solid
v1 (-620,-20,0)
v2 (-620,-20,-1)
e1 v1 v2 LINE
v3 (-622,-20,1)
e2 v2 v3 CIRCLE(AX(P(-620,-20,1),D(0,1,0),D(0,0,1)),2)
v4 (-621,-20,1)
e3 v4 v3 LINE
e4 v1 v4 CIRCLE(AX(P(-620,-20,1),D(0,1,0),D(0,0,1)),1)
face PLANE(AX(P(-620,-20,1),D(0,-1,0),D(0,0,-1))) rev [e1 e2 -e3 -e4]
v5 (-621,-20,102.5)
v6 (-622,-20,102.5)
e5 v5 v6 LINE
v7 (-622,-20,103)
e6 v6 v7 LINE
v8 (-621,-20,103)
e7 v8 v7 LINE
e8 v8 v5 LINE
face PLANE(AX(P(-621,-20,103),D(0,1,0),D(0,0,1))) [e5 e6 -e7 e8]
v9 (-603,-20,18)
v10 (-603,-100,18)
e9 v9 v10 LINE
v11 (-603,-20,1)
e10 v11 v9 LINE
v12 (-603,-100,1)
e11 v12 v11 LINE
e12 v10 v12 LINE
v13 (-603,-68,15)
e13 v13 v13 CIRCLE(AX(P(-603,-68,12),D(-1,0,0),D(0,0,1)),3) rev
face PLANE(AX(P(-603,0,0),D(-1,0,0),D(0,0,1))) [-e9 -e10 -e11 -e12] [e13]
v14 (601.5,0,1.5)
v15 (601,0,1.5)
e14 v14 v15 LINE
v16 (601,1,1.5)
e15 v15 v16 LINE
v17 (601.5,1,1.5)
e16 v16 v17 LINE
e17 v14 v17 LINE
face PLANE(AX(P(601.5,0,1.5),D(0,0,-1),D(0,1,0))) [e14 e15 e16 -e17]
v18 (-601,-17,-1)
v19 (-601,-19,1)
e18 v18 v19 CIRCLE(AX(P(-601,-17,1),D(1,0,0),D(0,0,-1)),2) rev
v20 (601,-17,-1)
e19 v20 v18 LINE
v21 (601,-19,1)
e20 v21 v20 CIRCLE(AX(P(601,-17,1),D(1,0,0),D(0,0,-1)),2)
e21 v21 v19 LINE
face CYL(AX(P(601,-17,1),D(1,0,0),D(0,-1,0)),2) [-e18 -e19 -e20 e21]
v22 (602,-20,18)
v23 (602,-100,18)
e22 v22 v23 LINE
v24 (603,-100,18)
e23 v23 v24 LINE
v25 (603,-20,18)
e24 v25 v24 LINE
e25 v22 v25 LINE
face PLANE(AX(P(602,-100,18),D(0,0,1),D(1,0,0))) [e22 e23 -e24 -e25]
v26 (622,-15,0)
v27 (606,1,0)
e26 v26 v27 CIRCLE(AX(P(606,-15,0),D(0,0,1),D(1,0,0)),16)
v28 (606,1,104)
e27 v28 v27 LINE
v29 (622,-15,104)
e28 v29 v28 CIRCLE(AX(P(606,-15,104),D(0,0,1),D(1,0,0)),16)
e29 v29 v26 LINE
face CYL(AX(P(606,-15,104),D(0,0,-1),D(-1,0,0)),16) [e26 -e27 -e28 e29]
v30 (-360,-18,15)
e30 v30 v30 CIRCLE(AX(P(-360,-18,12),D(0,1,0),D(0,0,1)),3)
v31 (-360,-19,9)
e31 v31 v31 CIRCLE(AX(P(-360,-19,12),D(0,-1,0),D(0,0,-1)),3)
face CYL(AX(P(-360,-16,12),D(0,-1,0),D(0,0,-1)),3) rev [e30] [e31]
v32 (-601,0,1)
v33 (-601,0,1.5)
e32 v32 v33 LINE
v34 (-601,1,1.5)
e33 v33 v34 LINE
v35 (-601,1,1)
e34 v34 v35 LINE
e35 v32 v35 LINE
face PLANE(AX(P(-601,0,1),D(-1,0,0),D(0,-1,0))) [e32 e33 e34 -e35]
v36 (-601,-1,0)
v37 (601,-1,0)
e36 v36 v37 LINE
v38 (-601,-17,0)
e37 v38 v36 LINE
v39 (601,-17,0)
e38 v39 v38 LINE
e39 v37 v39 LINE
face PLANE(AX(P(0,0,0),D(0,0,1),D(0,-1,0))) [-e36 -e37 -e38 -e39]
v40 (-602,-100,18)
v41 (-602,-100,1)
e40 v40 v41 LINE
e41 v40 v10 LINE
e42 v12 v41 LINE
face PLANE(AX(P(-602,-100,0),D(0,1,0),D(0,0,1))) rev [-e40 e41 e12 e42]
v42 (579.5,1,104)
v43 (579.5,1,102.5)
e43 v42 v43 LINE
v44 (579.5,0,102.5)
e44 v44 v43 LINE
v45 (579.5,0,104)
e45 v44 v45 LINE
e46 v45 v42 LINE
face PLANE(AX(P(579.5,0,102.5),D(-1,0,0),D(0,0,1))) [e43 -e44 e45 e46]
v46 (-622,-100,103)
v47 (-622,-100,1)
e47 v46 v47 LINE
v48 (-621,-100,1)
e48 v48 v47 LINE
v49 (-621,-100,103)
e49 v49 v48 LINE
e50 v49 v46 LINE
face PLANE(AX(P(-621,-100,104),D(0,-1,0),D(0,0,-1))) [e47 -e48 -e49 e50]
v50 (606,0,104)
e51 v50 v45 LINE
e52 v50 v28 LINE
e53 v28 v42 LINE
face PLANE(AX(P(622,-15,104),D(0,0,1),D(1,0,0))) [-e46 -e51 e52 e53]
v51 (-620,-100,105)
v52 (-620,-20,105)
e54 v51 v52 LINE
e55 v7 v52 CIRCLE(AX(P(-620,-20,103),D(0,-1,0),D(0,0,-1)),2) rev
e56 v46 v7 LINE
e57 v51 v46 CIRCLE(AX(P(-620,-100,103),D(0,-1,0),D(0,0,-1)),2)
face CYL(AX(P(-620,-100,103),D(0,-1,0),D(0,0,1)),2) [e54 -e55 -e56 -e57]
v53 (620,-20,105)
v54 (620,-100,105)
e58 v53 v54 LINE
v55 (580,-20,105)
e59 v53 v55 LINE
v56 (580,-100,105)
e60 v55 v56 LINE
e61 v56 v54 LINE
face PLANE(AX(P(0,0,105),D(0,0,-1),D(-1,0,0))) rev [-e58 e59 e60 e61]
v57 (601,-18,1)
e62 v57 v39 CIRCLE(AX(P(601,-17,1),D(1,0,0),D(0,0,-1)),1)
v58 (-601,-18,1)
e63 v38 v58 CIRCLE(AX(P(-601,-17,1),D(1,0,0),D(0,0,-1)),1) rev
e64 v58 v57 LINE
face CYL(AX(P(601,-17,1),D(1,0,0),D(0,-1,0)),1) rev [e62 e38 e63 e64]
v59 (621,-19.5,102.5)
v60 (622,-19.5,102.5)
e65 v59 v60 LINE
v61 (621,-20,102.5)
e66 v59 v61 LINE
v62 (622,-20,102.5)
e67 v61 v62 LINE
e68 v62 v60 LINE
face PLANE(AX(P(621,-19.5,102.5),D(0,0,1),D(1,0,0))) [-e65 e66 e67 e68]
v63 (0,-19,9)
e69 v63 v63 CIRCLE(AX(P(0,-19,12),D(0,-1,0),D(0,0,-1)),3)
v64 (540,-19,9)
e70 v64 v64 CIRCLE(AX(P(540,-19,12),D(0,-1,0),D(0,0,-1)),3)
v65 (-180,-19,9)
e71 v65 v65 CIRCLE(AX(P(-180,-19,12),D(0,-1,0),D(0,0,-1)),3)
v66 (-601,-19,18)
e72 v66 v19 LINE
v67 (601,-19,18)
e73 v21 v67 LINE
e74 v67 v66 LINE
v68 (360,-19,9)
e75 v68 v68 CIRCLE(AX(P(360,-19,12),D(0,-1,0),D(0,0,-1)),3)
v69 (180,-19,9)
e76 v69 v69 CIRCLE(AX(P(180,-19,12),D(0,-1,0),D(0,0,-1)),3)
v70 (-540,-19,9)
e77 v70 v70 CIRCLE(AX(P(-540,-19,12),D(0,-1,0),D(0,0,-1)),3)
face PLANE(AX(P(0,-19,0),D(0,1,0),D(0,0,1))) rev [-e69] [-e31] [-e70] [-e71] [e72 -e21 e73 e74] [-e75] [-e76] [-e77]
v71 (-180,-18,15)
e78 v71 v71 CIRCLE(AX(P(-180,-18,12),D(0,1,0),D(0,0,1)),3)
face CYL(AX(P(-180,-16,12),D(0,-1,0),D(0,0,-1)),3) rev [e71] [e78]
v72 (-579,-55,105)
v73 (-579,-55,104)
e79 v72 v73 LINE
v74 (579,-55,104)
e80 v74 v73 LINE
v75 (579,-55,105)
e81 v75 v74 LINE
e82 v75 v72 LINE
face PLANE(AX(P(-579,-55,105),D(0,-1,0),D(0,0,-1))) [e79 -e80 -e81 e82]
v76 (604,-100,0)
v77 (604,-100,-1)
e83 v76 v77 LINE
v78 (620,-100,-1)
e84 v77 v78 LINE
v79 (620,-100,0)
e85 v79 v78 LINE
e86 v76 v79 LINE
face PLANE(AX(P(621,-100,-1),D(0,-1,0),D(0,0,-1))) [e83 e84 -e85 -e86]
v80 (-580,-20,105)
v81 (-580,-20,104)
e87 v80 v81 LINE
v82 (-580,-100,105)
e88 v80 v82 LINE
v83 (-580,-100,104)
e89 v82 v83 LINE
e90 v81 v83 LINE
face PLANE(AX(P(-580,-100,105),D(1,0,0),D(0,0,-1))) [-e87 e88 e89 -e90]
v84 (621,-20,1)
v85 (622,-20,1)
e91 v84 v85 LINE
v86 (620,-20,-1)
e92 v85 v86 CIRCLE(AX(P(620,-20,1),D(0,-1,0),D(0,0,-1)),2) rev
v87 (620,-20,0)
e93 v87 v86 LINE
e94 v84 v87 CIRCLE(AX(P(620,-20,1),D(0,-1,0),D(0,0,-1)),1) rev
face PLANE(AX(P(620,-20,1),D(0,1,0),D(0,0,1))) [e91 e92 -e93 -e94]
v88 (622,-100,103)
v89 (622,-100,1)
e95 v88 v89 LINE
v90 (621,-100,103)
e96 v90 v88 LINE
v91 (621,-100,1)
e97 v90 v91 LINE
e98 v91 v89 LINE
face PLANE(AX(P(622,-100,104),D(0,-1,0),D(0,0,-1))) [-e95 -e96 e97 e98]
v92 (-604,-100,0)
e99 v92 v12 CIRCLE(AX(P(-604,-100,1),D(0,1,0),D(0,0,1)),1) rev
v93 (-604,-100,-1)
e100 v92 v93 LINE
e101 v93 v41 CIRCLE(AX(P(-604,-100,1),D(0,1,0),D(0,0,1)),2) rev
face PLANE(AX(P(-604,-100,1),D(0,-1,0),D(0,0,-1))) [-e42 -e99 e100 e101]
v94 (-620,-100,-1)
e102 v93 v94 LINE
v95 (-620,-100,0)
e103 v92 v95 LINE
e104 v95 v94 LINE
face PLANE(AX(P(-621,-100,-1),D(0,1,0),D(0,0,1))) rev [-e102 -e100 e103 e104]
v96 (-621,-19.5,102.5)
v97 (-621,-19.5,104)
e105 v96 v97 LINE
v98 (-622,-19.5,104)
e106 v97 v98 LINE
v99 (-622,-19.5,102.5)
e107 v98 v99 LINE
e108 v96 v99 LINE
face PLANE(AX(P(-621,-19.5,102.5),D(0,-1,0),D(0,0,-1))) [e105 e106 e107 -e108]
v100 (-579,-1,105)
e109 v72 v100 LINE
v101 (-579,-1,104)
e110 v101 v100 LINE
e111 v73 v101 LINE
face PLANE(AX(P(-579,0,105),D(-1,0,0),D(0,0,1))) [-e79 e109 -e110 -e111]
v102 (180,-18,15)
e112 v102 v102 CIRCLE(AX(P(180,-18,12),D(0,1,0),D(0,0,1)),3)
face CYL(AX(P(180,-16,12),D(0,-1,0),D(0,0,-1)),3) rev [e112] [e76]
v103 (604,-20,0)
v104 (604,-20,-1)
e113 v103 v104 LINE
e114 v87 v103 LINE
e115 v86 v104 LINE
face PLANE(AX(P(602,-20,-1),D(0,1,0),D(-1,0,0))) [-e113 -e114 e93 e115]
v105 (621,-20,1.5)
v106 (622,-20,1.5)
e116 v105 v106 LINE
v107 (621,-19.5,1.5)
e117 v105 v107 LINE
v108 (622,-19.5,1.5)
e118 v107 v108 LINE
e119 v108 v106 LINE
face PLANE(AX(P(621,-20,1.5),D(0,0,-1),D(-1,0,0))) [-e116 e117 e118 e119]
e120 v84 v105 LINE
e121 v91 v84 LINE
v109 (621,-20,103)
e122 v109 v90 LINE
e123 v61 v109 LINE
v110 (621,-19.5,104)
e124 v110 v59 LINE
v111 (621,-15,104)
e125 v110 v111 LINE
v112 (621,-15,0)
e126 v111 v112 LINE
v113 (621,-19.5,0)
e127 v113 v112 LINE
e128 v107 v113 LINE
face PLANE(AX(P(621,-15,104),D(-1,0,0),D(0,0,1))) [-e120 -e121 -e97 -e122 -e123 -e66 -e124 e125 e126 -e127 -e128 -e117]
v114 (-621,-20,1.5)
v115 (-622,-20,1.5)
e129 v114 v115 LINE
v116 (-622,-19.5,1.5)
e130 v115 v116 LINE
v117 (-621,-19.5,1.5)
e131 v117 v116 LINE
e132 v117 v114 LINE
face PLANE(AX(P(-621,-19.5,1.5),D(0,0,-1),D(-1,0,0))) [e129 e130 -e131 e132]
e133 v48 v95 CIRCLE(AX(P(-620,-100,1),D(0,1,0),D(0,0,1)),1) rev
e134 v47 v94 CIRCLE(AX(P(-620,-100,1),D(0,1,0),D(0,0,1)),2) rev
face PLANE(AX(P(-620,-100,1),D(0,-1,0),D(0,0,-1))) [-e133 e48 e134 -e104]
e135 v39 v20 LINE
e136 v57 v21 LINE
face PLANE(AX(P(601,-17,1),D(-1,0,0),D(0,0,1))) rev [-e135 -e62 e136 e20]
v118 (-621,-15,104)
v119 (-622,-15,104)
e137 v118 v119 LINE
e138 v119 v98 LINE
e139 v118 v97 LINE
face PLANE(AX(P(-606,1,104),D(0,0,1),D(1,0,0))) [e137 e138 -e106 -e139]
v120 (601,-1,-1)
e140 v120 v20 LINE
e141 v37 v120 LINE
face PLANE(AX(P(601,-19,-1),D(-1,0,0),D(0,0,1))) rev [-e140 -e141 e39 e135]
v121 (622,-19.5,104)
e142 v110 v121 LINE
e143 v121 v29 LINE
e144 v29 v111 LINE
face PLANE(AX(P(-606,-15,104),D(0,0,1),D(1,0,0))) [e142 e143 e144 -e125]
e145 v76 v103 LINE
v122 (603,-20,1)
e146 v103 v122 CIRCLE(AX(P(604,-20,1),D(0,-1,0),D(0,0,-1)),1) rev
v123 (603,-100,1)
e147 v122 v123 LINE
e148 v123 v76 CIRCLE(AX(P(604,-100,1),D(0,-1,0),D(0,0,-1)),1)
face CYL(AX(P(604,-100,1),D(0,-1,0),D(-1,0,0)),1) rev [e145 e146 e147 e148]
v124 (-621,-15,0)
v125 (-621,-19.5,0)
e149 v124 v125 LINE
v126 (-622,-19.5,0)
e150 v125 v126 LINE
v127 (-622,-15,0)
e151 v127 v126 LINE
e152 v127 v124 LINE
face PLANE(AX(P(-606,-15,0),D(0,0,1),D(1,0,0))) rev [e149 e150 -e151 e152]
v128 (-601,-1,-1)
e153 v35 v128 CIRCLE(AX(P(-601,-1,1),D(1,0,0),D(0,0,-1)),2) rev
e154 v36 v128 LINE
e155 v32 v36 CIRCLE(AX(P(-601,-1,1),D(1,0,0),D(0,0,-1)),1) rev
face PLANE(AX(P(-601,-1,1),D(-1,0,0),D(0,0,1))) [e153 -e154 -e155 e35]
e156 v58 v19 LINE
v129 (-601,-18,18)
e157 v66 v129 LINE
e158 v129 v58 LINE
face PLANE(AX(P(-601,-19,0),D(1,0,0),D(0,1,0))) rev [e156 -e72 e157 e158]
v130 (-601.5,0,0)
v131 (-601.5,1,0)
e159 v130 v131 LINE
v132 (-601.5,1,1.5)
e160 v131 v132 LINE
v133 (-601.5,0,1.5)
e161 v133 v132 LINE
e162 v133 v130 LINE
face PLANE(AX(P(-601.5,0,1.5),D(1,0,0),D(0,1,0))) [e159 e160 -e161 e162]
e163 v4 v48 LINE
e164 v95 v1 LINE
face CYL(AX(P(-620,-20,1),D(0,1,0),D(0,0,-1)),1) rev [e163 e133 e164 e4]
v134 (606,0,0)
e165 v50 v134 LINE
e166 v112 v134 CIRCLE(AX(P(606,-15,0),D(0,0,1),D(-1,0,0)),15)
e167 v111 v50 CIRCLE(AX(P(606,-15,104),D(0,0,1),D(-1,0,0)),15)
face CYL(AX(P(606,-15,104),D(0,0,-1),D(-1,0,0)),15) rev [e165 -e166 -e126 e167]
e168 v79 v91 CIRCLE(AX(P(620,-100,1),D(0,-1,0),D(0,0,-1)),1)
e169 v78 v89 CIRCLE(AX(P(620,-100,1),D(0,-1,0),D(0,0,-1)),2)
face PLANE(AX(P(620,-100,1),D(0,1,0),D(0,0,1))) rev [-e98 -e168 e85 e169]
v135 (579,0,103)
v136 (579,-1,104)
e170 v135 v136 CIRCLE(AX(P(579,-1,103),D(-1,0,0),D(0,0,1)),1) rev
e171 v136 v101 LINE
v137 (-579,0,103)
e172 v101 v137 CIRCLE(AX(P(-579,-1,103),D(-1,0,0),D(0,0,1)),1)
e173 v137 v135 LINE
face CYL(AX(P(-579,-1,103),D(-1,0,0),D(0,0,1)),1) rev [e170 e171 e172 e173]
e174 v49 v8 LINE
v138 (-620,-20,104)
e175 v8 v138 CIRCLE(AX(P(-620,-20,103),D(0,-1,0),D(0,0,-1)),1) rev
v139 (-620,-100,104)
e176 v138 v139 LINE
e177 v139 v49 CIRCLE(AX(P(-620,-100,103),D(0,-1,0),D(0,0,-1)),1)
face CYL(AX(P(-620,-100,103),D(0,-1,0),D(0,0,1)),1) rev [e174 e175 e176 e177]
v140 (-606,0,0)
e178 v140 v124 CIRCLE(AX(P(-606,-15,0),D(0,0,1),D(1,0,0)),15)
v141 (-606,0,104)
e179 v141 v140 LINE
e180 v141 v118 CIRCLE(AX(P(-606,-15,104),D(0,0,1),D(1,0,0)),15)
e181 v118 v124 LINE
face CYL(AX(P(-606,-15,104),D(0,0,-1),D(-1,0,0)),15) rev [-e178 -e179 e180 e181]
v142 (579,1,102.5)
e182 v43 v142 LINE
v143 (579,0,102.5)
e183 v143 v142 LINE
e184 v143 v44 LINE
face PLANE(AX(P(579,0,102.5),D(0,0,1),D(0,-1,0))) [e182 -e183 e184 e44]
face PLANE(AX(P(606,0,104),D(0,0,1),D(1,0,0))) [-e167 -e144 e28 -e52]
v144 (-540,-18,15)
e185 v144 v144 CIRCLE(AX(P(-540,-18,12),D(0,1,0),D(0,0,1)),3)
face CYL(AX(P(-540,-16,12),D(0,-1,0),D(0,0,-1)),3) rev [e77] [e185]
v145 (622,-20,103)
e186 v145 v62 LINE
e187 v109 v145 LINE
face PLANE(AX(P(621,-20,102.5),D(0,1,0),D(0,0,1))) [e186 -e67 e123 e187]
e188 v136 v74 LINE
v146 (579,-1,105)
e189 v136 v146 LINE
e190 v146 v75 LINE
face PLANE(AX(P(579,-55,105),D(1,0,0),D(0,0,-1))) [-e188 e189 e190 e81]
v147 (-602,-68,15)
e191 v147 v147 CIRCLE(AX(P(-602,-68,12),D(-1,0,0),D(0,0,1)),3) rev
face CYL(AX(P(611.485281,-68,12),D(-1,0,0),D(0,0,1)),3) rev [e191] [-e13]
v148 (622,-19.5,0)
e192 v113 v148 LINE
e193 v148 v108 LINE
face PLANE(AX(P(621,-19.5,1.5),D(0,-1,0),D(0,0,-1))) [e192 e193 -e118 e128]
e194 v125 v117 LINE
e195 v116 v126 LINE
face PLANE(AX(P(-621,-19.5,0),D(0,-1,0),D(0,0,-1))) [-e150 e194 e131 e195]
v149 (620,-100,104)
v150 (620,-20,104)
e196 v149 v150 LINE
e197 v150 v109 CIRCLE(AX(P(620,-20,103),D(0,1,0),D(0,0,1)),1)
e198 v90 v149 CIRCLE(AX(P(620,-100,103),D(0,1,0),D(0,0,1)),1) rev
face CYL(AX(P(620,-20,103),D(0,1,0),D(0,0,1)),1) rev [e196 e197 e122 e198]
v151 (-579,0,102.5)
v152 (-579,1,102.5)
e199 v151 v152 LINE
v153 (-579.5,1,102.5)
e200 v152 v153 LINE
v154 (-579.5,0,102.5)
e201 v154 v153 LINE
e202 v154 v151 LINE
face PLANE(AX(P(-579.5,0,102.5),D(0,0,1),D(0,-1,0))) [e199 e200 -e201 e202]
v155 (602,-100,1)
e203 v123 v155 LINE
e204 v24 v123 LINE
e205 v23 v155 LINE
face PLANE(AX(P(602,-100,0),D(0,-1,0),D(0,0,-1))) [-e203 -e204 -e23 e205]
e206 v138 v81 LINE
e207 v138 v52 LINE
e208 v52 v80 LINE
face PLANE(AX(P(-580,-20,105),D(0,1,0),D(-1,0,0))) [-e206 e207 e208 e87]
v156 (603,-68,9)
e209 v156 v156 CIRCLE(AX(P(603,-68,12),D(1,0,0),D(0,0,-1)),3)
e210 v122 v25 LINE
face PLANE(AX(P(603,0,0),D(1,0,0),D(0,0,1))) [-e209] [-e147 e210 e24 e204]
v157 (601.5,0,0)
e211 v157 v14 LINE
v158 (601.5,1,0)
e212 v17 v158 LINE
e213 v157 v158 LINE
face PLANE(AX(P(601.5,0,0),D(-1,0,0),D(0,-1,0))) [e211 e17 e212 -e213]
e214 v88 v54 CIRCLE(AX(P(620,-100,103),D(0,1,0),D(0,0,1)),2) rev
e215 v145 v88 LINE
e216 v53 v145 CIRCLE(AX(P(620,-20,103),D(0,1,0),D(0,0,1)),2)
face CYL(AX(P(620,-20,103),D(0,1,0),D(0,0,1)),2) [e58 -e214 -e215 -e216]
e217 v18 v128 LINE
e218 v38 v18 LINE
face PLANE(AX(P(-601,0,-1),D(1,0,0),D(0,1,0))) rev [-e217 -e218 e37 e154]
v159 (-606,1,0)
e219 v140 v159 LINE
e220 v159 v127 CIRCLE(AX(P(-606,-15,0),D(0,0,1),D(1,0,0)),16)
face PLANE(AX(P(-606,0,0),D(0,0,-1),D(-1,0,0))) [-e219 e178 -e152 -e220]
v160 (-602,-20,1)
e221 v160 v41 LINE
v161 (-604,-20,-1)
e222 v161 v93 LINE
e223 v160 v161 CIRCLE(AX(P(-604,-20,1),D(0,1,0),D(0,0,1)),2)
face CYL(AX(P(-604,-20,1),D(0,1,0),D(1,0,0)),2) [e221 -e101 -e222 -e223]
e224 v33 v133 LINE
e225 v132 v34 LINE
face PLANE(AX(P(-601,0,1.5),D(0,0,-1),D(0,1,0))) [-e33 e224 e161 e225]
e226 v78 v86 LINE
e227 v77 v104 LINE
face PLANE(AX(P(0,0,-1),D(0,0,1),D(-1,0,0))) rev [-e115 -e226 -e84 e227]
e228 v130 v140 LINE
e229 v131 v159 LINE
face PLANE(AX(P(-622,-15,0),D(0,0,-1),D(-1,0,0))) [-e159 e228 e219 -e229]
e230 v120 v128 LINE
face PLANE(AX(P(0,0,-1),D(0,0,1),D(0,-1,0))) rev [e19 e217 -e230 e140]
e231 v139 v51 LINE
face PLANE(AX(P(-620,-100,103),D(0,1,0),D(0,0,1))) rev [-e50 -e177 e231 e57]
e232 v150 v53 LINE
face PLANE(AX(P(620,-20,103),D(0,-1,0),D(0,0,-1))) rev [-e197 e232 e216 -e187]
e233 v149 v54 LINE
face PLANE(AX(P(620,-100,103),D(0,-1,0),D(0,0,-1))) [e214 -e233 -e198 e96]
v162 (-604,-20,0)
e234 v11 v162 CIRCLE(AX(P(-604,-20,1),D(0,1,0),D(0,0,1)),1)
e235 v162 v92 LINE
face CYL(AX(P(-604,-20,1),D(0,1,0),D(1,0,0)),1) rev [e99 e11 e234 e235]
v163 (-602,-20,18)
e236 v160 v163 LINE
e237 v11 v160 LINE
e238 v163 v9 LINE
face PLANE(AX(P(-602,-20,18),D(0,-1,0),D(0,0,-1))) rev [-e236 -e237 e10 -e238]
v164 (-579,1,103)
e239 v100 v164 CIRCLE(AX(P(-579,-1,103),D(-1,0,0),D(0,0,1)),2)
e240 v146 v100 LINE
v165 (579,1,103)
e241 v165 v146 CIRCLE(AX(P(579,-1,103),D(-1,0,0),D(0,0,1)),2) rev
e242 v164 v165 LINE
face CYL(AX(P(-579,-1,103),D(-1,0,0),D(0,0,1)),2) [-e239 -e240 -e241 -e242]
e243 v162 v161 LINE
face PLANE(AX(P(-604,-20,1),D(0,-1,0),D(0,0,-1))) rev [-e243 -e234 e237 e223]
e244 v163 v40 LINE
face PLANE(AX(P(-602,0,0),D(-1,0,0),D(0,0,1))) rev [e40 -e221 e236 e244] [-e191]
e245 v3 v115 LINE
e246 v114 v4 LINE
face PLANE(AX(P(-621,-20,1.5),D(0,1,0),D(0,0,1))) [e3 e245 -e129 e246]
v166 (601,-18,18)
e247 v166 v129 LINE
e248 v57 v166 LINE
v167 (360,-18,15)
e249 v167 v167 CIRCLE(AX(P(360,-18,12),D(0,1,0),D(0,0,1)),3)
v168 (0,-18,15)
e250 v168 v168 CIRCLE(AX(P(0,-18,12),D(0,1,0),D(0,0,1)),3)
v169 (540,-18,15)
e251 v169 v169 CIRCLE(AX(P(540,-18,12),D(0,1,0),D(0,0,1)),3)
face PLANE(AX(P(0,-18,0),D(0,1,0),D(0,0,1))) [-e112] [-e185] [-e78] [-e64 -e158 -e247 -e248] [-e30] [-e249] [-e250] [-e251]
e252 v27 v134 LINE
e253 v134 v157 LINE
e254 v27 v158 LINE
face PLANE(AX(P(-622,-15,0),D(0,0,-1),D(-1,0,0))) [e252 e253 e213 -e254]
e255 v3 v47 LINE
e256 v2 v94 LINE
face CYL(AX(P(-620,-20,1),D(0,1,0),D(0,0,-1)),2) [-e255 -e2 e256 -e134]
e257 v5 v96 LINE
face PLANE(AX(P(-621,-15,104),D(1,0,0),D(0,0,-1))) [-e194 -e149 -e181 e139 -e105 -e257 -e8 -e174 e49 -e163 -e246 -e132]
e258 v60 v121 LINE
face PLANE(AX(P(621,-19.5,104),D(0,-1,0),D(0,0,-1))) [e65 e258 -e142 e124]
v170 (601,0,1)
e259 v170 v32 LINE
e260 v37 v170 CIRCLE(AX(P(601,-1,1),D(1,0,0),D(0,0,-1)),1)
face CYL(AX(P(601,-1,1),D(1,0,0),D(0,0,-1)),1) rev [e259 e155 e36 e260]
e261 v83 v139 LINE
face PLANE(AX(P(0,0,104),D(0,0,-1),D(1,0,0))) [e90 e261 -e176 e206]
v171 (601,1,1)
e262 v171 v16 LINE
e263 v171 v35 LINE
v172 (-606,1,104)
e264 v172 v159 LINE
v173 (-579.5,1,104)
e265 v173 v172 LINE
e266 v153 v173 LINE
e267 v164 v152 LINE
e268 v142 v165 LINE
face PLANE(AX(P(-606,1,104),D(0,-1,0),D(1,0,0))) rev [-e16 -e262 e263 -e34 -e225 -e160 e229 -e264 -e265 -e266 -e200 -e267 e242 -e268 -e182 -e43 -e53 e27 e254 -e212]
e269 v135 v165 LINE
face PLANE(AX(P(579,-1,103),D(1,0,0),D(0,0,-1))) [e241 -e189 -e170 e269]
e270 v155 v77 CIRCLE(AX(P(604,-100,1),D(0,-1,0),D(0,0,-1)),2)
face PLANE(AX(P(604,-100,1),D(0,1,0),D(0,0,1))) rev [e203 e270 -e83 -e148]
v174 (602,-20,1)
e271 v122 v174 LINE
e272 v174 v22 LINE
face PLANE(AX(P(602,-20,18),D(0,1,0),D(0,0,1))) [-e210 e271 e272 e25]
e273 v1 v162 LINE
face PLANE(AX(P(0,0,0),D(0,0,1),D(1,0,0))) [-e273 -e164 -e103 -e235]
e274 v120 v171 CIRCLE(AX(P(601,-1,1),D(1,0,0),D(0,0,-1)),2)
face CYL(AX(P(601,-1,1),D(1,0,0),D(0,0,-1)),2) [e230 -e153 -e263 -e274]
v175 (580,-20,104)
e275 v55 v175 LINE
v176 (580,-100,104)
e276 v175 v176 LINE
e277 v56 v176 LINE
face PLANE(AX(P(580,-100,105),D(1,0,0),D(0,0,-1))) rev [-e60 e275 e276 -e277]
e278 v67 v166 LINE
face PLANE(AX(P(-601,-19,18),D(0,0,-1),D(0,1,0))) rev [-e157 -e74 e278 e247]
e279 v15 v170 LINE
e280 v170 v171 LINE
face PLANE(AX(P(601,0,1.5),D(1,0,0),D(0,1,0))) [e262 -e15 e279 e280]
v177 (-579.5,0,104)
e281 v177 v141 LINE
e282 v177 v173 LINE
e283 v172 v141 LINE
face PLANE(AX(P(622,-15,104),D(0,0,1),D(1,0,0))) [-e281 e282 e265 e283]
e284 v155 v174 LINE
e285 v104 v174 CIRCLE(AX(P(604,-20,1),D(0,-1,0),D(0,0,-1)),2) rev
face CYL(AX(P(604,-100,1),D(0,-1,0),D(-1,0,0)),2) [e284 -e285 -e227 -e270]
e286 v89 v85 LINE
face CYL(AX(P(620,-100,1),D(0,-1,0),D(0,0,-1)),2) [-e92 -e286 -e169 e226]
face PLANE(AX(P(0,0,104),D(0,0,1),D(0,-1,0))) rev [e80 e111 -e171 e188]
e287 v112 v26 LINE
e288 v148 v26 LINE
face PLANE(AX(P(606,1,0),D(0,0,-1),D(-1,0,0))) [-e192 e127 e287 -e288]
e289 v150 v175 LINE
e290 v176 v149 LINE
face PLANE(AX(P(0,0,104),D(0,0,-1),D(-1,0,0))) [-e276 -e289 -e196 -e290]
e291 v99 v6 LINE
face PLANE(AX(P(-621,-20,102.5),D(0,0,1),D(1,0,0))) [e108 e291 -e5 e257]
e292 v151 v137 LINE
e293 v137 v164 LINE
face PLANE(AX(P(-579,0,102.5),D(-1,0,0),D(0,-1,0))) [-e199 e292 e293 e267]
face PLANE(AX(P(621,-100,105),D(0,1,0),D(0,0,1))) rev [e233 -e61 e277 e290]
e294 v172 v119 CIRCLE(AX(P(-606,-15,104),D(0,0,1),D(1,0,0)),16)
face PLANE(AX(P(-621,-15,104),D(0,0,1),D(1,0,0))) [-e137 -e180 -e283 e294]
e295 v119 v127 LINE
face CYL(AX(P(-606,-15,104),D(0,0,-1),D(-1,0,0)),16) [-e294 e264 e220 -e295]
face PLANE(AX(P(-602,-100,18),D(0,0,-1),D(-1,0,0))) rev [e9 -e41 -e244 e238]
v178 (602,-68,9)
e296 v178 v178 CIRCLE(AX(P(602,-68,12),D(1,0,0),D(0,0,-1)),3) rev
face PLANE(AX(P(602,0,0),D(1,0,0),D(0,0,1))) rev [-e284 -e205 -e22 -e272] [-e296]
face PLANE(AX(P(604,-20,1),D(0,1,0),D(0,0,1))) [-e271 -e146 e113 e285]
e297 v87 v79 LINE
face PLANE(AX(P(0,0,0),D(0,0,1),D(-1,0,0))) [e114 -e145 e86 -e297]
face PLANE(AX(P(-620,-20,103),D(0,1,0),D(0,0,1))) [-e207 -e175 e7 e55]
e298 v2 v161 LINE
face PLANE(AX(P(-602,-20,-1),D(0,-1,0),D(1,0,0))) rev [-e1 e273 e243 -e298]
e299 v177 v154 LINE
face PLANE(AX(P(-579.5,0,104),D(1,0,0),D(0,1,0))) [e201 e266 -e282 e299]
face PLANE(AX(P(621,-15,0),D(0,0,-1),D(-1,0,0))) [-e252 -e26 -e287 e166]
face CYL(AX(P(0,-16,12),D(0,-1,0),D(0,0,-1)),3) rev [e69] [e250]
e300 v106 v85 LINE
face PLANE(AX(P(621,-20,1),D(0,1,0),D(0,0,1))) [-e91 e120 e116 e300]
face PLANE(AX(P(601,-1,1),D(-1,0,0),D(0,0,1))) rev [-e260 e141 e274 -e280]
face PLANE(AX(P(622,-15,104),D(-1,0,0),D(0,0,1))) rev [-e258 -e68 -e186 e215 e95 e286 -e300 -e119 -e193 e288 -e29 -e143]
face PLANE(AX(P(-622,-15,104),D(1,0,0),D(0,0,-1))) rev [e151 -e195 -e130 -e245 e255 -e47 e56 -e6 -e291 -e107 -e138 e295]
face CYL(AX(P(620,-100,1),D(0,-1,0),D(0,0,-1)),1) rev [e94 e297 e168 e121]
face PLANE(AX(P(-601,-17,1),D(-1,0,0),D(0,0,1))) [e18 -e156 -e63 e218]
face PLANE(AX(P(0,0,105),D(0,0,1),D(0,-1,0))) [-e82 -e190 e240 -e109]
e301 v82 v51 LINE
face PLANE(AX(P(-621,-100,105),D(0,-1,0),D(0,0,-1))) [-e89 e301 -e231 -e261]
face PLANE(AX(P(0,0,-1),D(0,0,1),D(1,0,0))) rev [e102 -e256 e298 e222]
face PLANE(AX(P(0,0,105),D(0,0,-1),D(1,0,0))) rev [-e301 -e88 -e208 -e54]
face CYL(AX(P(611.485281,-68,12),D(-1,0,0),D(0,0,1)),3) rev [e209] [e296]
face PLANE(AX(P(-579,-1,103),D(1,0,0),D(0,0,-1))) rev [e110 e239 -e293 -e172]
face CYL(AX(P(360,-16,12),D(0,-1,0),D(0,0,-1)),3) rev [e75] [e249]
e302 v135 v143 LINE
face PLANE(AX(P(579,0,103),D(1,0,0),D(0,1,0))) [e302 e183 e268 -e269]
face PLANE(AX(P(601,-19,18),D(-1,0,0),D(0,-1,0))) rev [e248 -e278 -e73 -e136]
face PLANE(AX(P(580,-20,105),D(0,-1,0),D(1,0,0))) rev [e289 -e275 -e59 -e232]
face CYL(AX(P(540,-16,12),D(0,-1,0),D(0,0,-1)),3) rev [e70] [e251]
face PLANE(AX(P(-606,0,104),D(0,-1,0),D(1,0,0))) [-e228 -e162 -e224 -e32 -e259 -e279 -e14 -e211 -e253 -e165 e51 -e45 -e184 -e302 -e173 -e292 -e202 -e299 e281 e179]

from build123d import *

# Parameters (mm, degrees)
BASE_FLANGE1_DEPTH             = 104
EDGE_FLANGE1_STRIP_W           = 6
EDGE_FLANGE1_STRIP_H           = 1
EDGE_FLANGE1_STRIP_CUT_DEPTH   = 1202
EDGE_FLANGE1_RELIEF_W          = 6.5
EDGE_FLANGE1_RELIEF_H          = 0.5
EDGE_FLANGE1_RELIEF_CUT_DEPTH  = 1
EDGE_FLANGE1_DEPTH             = 1202
EDGE_FLANGE2_STRIP_W           = 6
EDGE_FLANGE2_STRIP_H           = 1
EDGE_FLANGE2_STRIP_CUT_DEPTH   = 1202
EDGE_FLANGE2_DEPTH             = 1202
EDGE_FLANGE3_STRIP_W           = 6
EDGE_FLANGE3_STRIP_H           = 1
EDGE_FLANGE3_STRIP_CUT_DEPTH   = 80
EDGE_FLANGE3_RELIEF_W          = 6.5
EDGE_FLANGE3_RELIEF_H          = 0.5
EDGE_FLANGE3_RELIEF_CUT_DEPTH  = 1
EDGE_FLANGE3_DEPTH             = 80
EDGE_FLANGE4_STRIP_W           = 6
EDGE_FLANGE4_STRIP_H           = 1
EDGE_FLANGE4_STRIP_CUT_DEPTH   = 80
EDGE_FLANGE4_DEPTH             = 80
EDGE_FLANGE5_STRIP_W           = 6
EDGE_FLANGE5_STRIP_H           = 1
EDGE_FLANGE5_STRIP_CUT_DEPTH   = 1158
EDGE_FLANGE5_RELIEF_W          = 6.5
EDGE_FLANGE5_RELIEF_H          = 0.5
EDGE_FLANGE5_RELIEF_CUT_DEPTH  = 1
EDGE_FLANGE5_DEPTH             = 1158
EDGE_FLANGE6_STRIP_W           = 6
EDGE_FLANGE6_STRIP_H           = 1
EDGE_FLANGE6_STRIP_CUT_DEPTH   = 80
EDGE_FLANGE6_RELIEF_W          = 6.5
EDGE_FLANGE6_RELIEF_H          = 0.5
EDGE_FLANGE6_RELIEF_CUT_DEPTH  = 1
EDGE_FLANGE6_DEPTH             = 80
SKETCH25_R                     = 3
CUT_EXTRUDE1_DEPTH             = 3
SKETCH26_R                     = 3
CUT_EXTRUDE2_DEPTH             = 3
CUT_EXTRUDE2_DIRECTION_2_REACH = 1234.559


# Sheet-metal steps are written as plain solids
with BuildPart() as part:
    # Sketch1 → Base-Flange1 (new body)
    with BuildSketch(Plane.XY):
        with BuildLine():
            Line((-621, -100), (-621, -15))
            ThreePointArc((-621, -15), (-616.606601718, -4.393398282), (-606, 0))
            Line((-606, 0), (606, 0))
            ThreePointArc((606, 0), (616.606601718, -4.393398282), (621, -15))
            Line((621, -15), (621, -100))
            Line((621, -100), (622, -100))
            Line((622, -100), (622, -15))
            ThreePointArc((622, -15), (617.313708499, -3.686291501), (606, 1))
            Line((606, 1), (-606, 1))
            ThreePointArc((-606, 1), (-617.313708499, -3.686291501), (-622, -15))
            Line((-622, -15), (-622, -100))
            Line((-622, -100), (-621, -100))
        make_face()
    extrude(amount=BASE_FLANGE1_DEPTH)

    # Edge-Flange1 strip (across the edge) → Edge-Flange1 strip cut (cut)
    with BuildSketch(Plane(origin=(-601, 0, 0), x_dir=(0, 0, 1), z_dir=(1, 0, 0))):
        with Locations((-2, -0.5)):
            Rectangle(EDGE_FLANGE1_STRIP_W, EDGE_FLANGE1_STRIP_H)
    extrude(amount=EDGE_FLANGE1_STRIP_CUT_DEPTH, mode=Mode.SUBTRACT)

    # Edge-Flange1 relief (on the sheet) → Edge-Flange1 relief cut (cut)
    with BuildSketch(Plane(origin=(-601, 0, 1), x_dir=(0, 0, 1), z_dir=(0, -1, 0))):
        with Locations((-2.75, 0.25)):
            Rectangle(EDGE_FLANGE1_RELIEF_W, EDGE_FLANGE1_RELIEF_H)
        with Locations((-2.75, -1202.25)):
            Rectangle(EDGE_FLANGE1_RELIEF_W, EDGE_FLANGE1_RELIEF_H)
    extrude(amount=-EDGE_FLANGE1_RELIEF_CUT_DEPTH, mode=Mode.SUBTRACT)

    # Edge-Flange1 section (across the edge) → Edge-Flange1 (add)
    with BuildSketch(Plane(origin=(-601, 0, 0), x_dir=(0, 0, 1), z_dir=(1, 0, 0))):
        with BuildLine():
            Line((-1, 1), (-1, 19))
            Line((-1, 19), (0, 19))
            Line((0, 19), (0, 1))
            ThreePointArc((0, 1), (0.292893219, 0.292893219), (1, 0))
            Line((1, 0), (1, -1))
            ThreePointArc((1, -1), (-0.414213562, -0.414213562), (-1, 1))
        make_face()
    extrude(amount=EDGE_FLANGE1_DEPTH)

    # Edge-Flange2 strip (across the edge) → Edge-Flange2 strip cut (cut)
    with BuildSketch(Plane(origin=(-601, -19, 0), x_dir=(0, 1, 0), z_dir=(1, 0, 0))):
        with Locations((-1, -0.5)):
            Rectangle(EDGE_FLANGE2_STRIP_W, EDGE_FLANGE2_STRIP_H)
    extrude(amount=EDGE_FLANGE2_STRIP_CUT_DEPTH, mode=Mode.SUBTRACT)

    # Edge-Flange2 section (across the edge) → Edge-Flange2 (add)
    with BuildSketch(Plane(origin=(-601, -19, 0), x_dir=(0, 1, 0), z_dir=(1, 0, 0))):
        with BuildLine():
            Line((0, 1), (0, 18))
            Line((0, 18), (1, 18))
            Line((1, 18), (1, 1))
            ThreePointArc((1, 1), (1.292893219, 0.292893219), (2, 0))
            Line((2, 0), (2, -1))
            ThreePointArc((2, -1), (0.585786438, -0.414213562), (0, 1))
        make_face()
    extrude(amount=EDGE_FLANGE2_DEPTH)

    # Edge-Flange3 strip (across the edge) → Edge-Flange3 strip cut (cut)
    with BuildSketch(Plane(origin=(-621, -100, 0), x_dir=(0, 0, 1), z_dir=(0, 1, 0))):
        with Locations((-2, -0.5)):
            Rectangle(EDGE_FLANGE3_STRIP_W, EDGE_FLANGE3_STRIP_H)
    edge_flange3_strip_cut = extrude(amount=EDGE_FLANGE3_STRIP_CUT_DEPTH, mode=Mode.SUBTRACT)

    # Edge-Flange3 relief (on the sheet) → Edge-Flange3 relief cut (cut)
    with BuildSketch(Plane(origin=(-621, -100, 1), x_dir=(0, 0, 1), z_dir=(1, 0, 0))):
        with Locations((-2.75, -80.25)):
            Rectangle(EDGE_FLANGE3_RELIEF_W, EDGE_FLANGE3_RELIEF_H)
    edge_flange3_relief_cut = extrude(amount=-EDGE_FLANGE3_RELIEF_CUT_DEPTH, mode=Mode.SUBTRACT)

    # Edge-Flange3 section (across the edge) → Edge-Flange3 (add)
    with BuildSketch(Plane(origin=(-621, -100, 0), x_dir=(0, 0, 1), z_dir=(0, 1, 0))):
        with BuildLine():
            Line((-1, 1), (-1, 19))
            Line((-1, 19), (0, 19))
            Line((0, 19), (0, 1))
            ThreePointArc((0, 1), (0.292893219, 0.292893219), (1, 0))
            Line((1, 0), (1, -1))
            ThreePointArc((1, -1), (-0.414213562, -0.414213562), (-1, 1))
        make_face()
    edge_flange3 = extrude(amount=EDGE_FLANGE3_DEPTH)

    # Edge-Flange4 strip (across the edge) → Edge-Flange4 strip cut (cut)
    with BuildSketch(Plane(origin=(-602, -100, 0), x_dir=(-1, 0, 0), z_dir=(0, 1, 0))):
        with Locations((-1, -0.5)):
            Rectangle(EDGE_FLANGE4_STRIP_W, EDGE_FLANGE4_STRIP_H)
    edge_flange4_strip_cut = extrude(amount=EDGE_FLANGE4_STRIP_CUT_DEPTH, mode=Mode.SUBTRACT)

    # Edge-Flange4 section (across the edge) → Edge-Flange4 (add)
    with BuildSketch(Plane(origin=(-602, -100, 0), x_dir=(-1, 0, 0), z_dir=(0, 1, 0))):
        with BuildLine():
            Line((0, 1), (0, 18))
            Line((0, 18), (1, 18))
            Line((1, 18), (1, 1))
            ThreePointArc((1, 1), (1.292893219, 0.292893219), (2, 0))
            Line((2, 0), (2, -1))
            ThreePointArc((2, -1), (0.585786438, -0.414213562), (0, 1))
        make_face()
    edge_flange4 = extrude(amount=EDGE_FLANGE4_DEPTH)

    # Mirror1: Edge-Flange3 strip cut, Edge-Flange3 relief cut, Edge-Flange3, Edge-Flange4 strip cut, Edge-Flange4 across plane
    add(edge_flange3_strip_cut.mirror(Plane(origin=(0, 0, 0), x_dir=(0, 0, 1), z_dir=(1, 0, 0))), mode=Mode.SUBTRACT)
    add(edge_flange3_relief_cut.mirror(Plane(origin=(0, 0, 0), x_dir=(0, 0, 1), z_dir=(1, 0, 0))), mode=Mode.SUBTRACT)
    add(edge_flange3.mirror(Plane(origin=(0, 0, 0), x_dir=(0, 0, 1), z_dir=(1, 0, 0))))
    add(edge_flange4_strip_cut.mirror(Plane(origin=(0, 0, 0), x_dir=(0, 0, 1), z_dir=(1, 0, 0))), mode=Mode.SUBTRACT)
    add(edge_flange4.mirror(Plane(origin=(0, 0, 0), x_dir=(0, 0, 1), z_dir=(1, 0, 0))))

    # Edge-Flange5 strip (across the edge) → Edge-Flange5 strip cut (cut)
    with BuildSketch(Plane(origin=(579, 0, 104), x_dir=(0, 0, -1), z_dir=(-1, 0, 0))):
        with Locations((-2, -0.5)):
            Rectangle(EDGE_FLANGE5_STRIP_W, EDGE_FLANGE5_STRIP_H)
    extrude(amount=EDGE_FLANGE5_STRIP_CUT_DEPTH, mode=Mode.SUBTRACT)

    # Edge-Flange5 relief (on the sheet) → Edge-Flange5 relief cut (cut)
    with BuildSketch(Plane(origin=(579, 0, 103), x_dir=(0, 0, -1), z_dir=(0, -1, 0))):
        with Locations((-2.75, 0.25)):
            Rectangle(EDGE_FLANGE5_RELIEF_W, EDGE_FLANGE5_RELIEF_H)
        with Locations((-2.75, -1158.25)):
            Rectangle(EDGE_FLANGE5_RELIEF_W, EDGE_FLANGE5_RELIEF_H)
    extrude(amount=-EDGE_FLANGE5_RELIEF_CUT_DEPTH, mode=Mode.SUBTRACT)

    # Edge-Flange5 section (across the edge) → Edge-Flange5 (add)
    with BuildSketch(Plane(origin=(579, 0, 104), x_dir=(0, 0, -1), z_dir=(-1, 0, 0))):
        with BuildLine():
            Line((-1, 1), (-1, 55))
            Line((-1, 55), (0, 55))
            Line((0, 55), (0, 1))
            ThreePointArc((0, 1), (0.292893219, 0.292893219), (1, 0))
            Line((1, 0), (1, -1))
            ThreePointArc((1, -1), (-0.414213562, -0.414213562), (-1, 1))
        make_face()
    extrude(amount=EDGE_FLANGE5_DEPTH)

    # Edge-Flange6 strip (across the edge) → Edge-Flange6 strip cut (cut)
    with BuildSketch(Plane(origin=(621, -100, 104), x_dir=(0, 0, -1), z_dir=(0, 1, 0))):
        with Locations((-2, -0.5)):
            Rectangle(EDGE_FLANGE6_STRIP_W, EDGE_FLANGE6_STRIP_H)
    edge_flange6_strip_cut = extrude(amount=EDGE_FLANGE6_STRIP_CUT_DEPTH, mode=Mode.SUBTRACT)

    # Edge-Flange6 relief (on the sheet) → Edge-Flange6 relief cut (cut)
    with BuildSketch(Plane(origin=(621, -100, 103), x_dir=(0, 0, -1), z_dir=(-1, 0, 0))):
        with Locations((-2.75, -80.25)):
            Rectangle(EDGE_FLANGE6_RELIEF_W, EDGE_FLANGE6_RELIEF_H)
    edge_flange6_relief_cut = extrude(amount=-EDGE_FLANGE6_RELIEF_CUT_DEPTH, mode=Mode.SUBTRACT)

    # Edge-Flange6 section (across the edge) → Edge-Flange6 (add)
    with BuildSketch(Plane(origin=(621, -100, 104), x_dir=(0, 0, -1), z_dir=(0, 1, 0))):
        with BuildLine():
            Line((-1, 1), (-1, 41))
            Line((-1, 41), (0, 41))
            Line((0, 41), (0, 1))
            ThreePointArc((0, 1), (0.292893219, 0.292893219), (1, 0))
            Line((1, 0), (1, -1))
            ThreePointArc((1, -1), (-0.414213562, -0.414213562), (-1, 1))
        make_face()
    edge_flange6 = extrude(amount=EDGE_FLANGE6_DEPTH)

    # Mirror2: Edge-Flange6 strip cut, Edge-Flange6 relief cut, Edge-Flange6 across plane
    add(edge_flange6_strip_cut.mirror(Plane(origin=(0, 0, 0), x_dir=(0, 0, 1), z_dir=(1, 0, 0))), mode=Mode.SUBTRACT)
    add(edge_flange6_relief_cut.mirror(Plane(origin=(0, 0, 0), x_dir=(0, 0, 1), z_dir=(1, 0, 0))), mode=Mode.SUBTRACT)
    add(edge_flange6.mirror(Plane(origin=(0, 0, 0), x_dir=(0, 0, 1), z_dir=(1, 0, 0))))

    # Sketch25 → Cut-Extrude1 (cut)
    with BuildSketch(Plane.XZ.offset(19)):
        with Locations(Location((-540, 12, 0), (0, 0, 270))):
            Circle(SKETCH25_R)
        with Locations(Location((-360, 12, 0), (0, 0, 270))):
            Circle(SKETCH25_R)
        with Locations(Location((-180, 12, 0), (0, 0, 270))):
            Circle(SKETCH25_R)
        with Locations(Location((0, 12, 0), (0, 0, 270))):
            Circle(SKETCH25_R)
        with Locations(Location((180, 12, 0), (0, 0, 270))):
            Circle(SKETCH25_R)
        with Locations(Location((360, 12, 0), (0, 0, 270))):
            Circle(SKETCH25_R)
        with Locations(Location((540, 12, 0), (0, 0, 270))):
            Circle(SKETCH25_R)
    extrude(amount=-CUT_EXTRUDE1_DEPTH, mode=Mode.SUBTRACT)

    # Sketch26 → Cut-Extrude2 (cut)
    with BuildSketch(Plane(origin=(-602, 0, 0), x_dir=(0, 0, -1), z_dir=(1, 0, 0))):
        with Locations((-12, -68)):
            Circle(SKETCH26_R)
    extrude(amount=-CUT_EXTRUDE2_DEPTH, mode=Mode.SUBTRACT)

    # Cut-Extrude2 direction 2: up to this face of the body (flat: up to its plane)
    cut_extrude2_direction_2_end = Plane(part.part.faces().sort_by_distance((603, -60, 9.5))[0])
    # Sketch26 → Cut-Extrude2 direction 2 (cut, up to the picked face)
    with BuildSketch(Plane(origin=(-602, 0, 0), x_dir=(0, 0, -1), z_dir=(1, 0, 0)), mode=Mode.PRIVATE) as cut_extrude2_direction_2_sk1:
        with Locations((-12, -68)):
            Circle(SKETCH26_R)
    cut_extrude2_direction_2_tool1 = split(extrude(cut_extrude2_direction_2_sk1.sketch, amount=CUT_EXTRUDE2_DIRECTION_2_REACH, mode=Mode.PRIVATE), bisect_by=cut_extrude2_direction_2_end, keep=Keep.BOTH, mode=Mode.PRIVATE)
    add(cut_extrude2_direction_2_tool1.solids().sort_by(Axis((-602, -68, 12), (1, 0, 0)))[0], mode=Mode.SUBTRACT)


solid = part.part
